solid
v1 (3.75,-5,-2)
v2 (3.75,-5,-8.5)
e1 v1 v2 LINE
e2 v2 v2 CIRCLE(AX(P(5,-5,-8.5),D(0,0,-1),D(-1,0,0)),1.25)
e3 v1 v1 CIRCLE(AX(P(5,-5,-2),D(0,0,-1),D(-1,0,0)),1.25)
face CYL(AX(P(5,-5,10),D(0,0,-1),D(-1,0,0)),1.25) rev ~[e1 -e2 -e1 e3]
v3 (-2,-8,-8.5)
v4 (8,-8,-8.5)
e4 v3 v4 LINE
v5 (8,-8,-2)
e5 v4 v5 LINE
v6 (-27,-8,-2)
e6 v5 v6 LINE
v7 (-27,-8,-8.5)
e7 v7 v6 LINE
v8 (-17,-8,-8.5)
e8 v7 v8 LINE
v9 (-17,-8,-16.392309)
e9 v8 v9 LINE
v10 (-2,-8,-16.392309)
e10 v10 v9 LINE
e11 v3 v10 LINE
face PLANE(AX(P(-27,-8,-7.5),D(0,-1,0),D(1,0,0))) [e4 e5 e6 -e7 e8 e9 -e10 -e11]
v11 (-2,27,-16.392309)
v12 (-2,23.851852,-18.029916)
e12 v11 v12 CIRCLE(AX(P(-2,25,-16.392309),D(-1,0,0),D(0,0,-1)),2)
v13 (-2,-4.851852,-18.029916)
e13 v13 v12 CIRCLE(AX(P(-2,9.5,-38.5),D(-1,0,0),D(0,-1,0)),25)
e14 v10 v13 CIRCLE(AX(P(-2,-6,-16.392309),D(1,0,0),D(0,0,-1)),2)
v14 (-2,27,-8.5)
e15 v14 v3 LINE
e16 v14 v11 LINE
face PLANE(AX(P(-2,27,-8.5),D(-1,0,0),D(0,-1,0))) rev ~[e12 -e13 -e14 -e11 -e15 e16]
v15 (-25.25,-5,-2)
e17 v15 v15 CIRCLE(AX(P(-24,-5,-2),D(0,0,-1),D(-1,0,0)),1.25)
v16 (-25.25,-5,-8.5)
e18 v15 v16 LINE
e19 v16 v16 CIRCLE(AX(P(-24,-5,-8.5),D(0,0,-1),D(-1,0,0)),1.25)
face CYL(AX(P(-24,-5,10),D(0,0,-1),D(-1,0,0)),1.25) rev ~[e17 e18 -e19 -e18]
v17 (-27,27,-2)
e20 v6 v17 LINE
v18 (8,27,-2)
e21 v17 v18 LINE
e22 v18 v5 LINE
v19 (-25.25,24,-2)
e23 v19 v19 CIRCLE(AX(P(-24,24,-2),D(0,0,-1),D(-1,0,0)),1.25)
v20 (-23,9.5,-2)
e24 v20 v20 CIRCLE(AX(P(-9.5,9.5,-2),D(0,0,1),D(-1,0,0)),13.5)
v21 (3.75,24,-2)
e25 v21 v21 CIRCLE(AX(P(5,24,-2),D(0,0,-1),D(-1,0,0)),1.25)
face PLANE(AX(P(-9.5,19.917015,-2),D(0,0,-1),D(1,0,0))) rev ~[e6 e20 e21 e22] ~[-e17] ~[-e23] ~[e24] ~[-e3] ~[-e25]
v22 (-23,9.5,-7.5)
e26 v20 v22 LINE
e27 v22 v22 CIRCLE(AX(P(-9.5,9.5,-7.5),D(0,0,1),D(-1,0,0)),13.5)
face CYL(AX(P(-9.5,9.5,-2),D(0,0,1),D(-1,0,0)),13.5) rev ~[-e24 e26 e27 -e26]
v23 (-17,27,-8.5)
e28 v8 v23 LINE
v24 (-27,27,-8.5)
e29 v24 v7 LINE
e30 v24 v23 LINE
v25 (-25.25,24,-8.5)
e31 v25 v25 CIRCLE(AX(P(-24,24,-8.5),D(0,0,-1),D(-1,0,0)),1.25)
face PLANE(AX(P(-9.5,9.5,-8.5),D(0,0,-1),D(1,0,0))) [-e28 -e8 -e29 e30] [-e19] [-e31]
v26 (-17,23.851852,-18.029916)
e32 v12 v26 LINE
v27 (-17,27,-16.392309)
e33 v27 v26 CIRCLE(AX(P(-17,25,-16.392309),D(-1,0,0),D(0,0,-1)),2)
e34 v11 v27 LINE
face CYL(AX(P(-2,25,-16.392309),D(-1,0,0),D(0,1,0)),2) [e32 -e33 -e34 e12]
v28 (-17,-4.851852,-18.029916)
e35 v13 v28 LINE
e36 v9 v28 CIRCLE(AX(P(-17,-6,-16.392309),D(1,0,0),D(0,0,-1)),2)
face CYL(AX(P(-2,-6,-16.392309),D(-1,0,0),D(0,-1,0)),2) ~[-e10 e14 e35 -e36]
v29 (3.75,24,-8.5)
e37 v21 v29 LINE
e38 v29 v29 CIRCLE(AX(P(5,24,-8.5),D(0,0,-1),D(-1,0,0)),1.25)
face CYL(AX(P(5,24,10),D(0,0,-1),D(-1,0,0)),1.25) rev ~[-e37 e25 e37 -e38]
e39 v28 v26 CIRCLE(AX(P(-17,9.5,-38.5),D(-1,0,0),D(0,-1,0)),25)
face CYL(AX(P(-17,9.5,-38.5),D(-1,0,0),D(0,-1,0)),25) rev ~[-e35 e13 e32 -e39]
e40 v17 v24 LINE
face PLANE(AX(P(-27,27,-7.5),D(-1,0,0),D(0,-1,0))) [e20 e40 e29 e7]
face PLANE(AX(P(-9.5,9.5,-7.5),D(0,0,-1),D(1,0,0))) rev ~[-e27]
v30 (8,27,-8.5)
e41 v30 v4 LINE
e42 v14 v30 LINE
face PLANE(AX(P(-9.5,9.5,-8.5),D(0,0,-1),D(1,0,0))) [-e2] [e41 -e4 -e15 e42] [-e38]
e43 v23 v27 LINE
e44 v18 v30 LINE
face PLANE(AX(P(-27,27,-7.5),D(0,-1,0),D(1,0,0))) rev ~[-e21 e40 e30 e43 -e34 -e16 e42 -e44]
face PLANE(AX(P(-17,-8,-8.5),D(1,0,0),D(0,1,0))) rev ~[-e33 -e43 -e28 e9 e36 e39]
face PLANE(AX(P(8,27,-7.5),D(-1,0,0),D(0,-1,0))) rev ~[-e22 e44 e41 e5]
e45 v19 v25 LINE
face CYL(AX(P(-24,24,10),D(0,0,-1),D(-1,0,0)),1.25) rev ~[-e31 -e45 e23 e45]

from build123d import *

# Parameters (mm, degrees)
F0_W       = 35
F0_H       = 35
F0_W_2     = 23
F0_H_2     = 23
F1_DEPTH   = 2
F3_DEPTH   = 5.5
F4_DEPTH   = 2.5
F5_DEPTH   = 1
F7_W       = 35
F7_H       = 35
F7_R       = 13.5
F8_DEPTH   = 1
F9_D       = 2.5
F9_DEPTH   = 10
F9_TIP     = 0.7510757738
F9_2_D     = 2.5
F9_2_DEPTH = 10
F9_2_TIP   = 0.7510757738
F10_W      = 7.5
F10_H      = 17.5
F11_DEPTH  = 25
F12_R      = 25
F13_DEPTH  = 25
F14_R      = 2


with BuildPart() as f1:
    # F0 (on Top) → F1 (new body)
    with BuildSketch(Plane.XY):
        with Locations((-9.5, 9.5)):
            Rectangle(F0_W, F0_H)
        with Locations((-9.5, 9.5)):
            Rectangle(F0_W_2, F0_H_2, mode=Mode.SUBTRACT)
        with Locations((-9.5, 9.5)):
            Rectangle(F0_W_2, F0_H_2)
        with BuildLine():
            Line((0, 5.027864045), (0, 0))
            Line((0, 0), (-5.027864045, 0))
            ThreePointArc((-5.027864045, 0), (-9.5, -1), (-13.972135955, 0))
            Line((-13.972135955, 0), (-19, 0))
            Line((-19, 0), (-19, 5.027864045))
            ThreePointArc((-19, 5.027864045), (-20, 9.5), (-19, 13.972135955))
            Line((-19, 13.972135955), (-19, 19))
            Line((-19, 19), (-13.972135955, 19))
            ThreePointArc((-13.972135955, 19), (-9.5, 20), (-5.027864045, 19))
            Line((-5.027864045, 19), (0, 19))
            Line((0, 19), (0, 13.972135955))
            ThreePointArc((0, 13.972135955), (0.746950766, 11.7912878475), (1, 9.5))
            ThreePointArc((1, 9.5), (0.746950766, 7.2087121525), (0, 5.027864045))
        make_face(mode=Mode.SUBTRACT)
        with BuildLine():
            Line((-13.972135955, 0), (-5.027864045, 0))
            ThreePointArc((-5.027864045, 0), (-2.0753787975, 2.0753787975), (0, 5.027864045))
            Line((0, 5.027864045), (0, 13.972135955))
            ThreePointArc((0, 13.972135955), (-2.0753787975, 16.9246212025), (-5.027864045, 19))
            Line((-5.027864045, 19), (-13.972135955, 19))
            ThreePointArc((-13.972135955, 19), (-16.9246212025, 16.9246212025), (-19, 13.972135955))
            Line((-19, 13.972135955), (-19, 5.027864045))
            ThreePointArc((-19, 5.027864045), (-16.9246212025, 2.0753787975), (-13.972135955, 0))
        make_face()
        with BuildLine():
            Line((-19, 19), (-19, 13.972135955))
            ThreePointArc((-19, 13.972135955), (-16.9246212025, 16.9246212025), (-13.972135955, 19))
            Line((-13.972135955, 19), (-19, 19))
        make_face()
        with BuildLine():
            ThreePointArc((-5.027864045, 19), (-2.0753787975, 16.9246212025), (0, 13.972135955))
            Line((0, 13.972135955), (0, 19))
            Line((0, 19), (-5.027864045, 19))
        make_face()
        with BuildLine():
            Line((-5.027864045, 0), (0, 0))
            Line((0, 0), (0, 5.027864045))
            ThreePointArc((0, 5.027864045), (-2.0753787975, 2.0753787975), (-5.027864045, 0))
        make_face()
        with BuildLine():
            Line((-19, 0), (-13.972135955, 0))
            ThreePointArc((-13.972135955, 0), (-16.9246212025, 2.0753787975), (-19, 5.027864045))
            Line((-19, 5.027864045), (-19, 0))
        make_face()
        with BuildLine():
            Line((0, 13.972135955), (0, 5.027864045))
            ThreePointArc((0, 5.027864045), (0.746950766, 7.2087121525), (1, 9.5))
            ThreePointArc((1, 9.5), (0.746950766, 11.7912878475), (0, 13.972135955))
        make_face()
        with BuildLine():
            ThreePointArc((-13.972135955, 0), (-9.5, -1), (-5.027864045, 0))
            Line((-5.027864045, 0), (-13.972135955, 0))
        make_face()
        with BuildLine():
            ThreePointArc((-19, 13.972135955), (-20, 9.5), (-19, 5.027864045))
            Line((-19, 5.027864045), (-19, 13.972135955))
        make_face()
        with BuildLine():
            Line((-13.972135955, 19), (-5.027864045, 19))
            ThreePointArc((-5.027864045, 19), (-9.5, 20), (-13.972135955, 19))
        make_face()
    extrude(amount=-F1_DEPTH)

    # F0 (on Top) → F4 (join)
    with BuildSketch(Plane.XY):
        with Locations((-9.5, 9.5)):
            Rectangle(F0_W_2, F0_H_2)
        with BuildLine():
            Line((0, 5.027864045), (0, 0))
            Line((0, 0), (-5.027864045, 0))
            ThreePointArc((-5.027864045, 0), (-9.5, -1), (-13.972135955, 0))
            Line((-13.972135955, 0), (-19, 0))
            Line((-19, 0), (-19, 5.027864045))
            ThreePointArc((-19, 5.027864045), (-20, 9.5), (-19, 13.972135955))
            Line((-19, 13.972135955), (-19, 19))
            Line((-19, 19), (-13.972135955, 19))
            ThreePointArc((-13.972135955, 19), (-9.5, 20), (-5.027864045, 19))
            Line((-5.027864045, 19), (0, 19))
            Line((0, 19), (0, 13.972135955))
            ThreePointArc((0, 13.972135955), (0.746950766, 11.7912878475), (1, 9.5))
            ThreePointArc((1, 9.5), (0.746950766, 7.2087121525), (0, 5.027864045))
        make_face(mode=Mode.SUBTRACT)
        with BuildLine():
            ThreePointArc((-19, 13.972135955), (-20, 9.5), (-19, 5.027864045))
            Line((-19, 5.027864045), (-19, 13.972135955))
        make_face()
        with BuildLine():
            Line((-13.972135955, 19), (-5.027864045, 19))
            ThreePointArc((-5.027864045, 19), (-9.5, 20), (-13.972135955, 19))
        make_face()
        with BuildLine():
            Line((0, 13.972135955), (0, 5.027864045))
            ThreePointArc((0, 5.027864045), (0.746950766, 7.2087121525), (1, 9.5))
            ThreePointArc((1, 9.5), (0.746950766, 11.7912878475), (0, 13.972135955))
        make_face()
        with BuildLine():
            ThreePointArc((-13.972135955, 0), (-9.5, -1), (-5.027864045, 0))
            Line((-5.027864045, 0), (-13.972135955, 0))
        make_face()
    extrude(amount=F4_DEPTH)


with BuildPart() as f3:
    # F2 (on face) → F3 (new body)
    with BuildSketch(Plane(origin=(0, 0, -2), x_dir=(1, 0, 0), z_dir=(0, 0, -1))):
        with BuildLine():
            Line((-27, -9.5), (-27, -27))
            Line((-27, -27), (8, -27))
            Line((8, -27), (8, -9.5))
            Line((8, -9.5), (4, -9.5))
            ThreePointArc((4, -9.5), (-9.5, -23), (-23, -9.5))
            Line((-23, -9.5), (-27, -9.5))
        make_face()
        with BuildLine():
            Line((-27, 8), (-27, -9.5))
            Line((-27, -9.5), (-23, -9.5))
            ThreePointArc((-23, -9.5), (-9.5, 4), (4, -9.5))
            Line((4, -9.5), (8, -9.5))
            Line((8, -9.5), (8, 8))
            Line((8, 8), (-27, 8))
        make_face()
    extrude(amount=F3_DEPTH)


with BuildPart() as f5:
    # F5 (new): a face of the model
    f5_faces = [f3.part.faces().sort_by_distance(p)[0] for p in [
        (-9.5, 26.5050252532, -7.5),
    ]]
    extrude(f5_faces, amount=F5_DEPTH)


with BuildPart() as f5b:
    # F5#2 (new): a face of the model
    f5_2_faces = [f1.part.faces().sort_by_distance(p)[0] for p in [
        (-9.5, 9.5, -2),
    ]]
    extrude(f5_2_faces, amount=F5_DEPTH)


with BuildPart() as f3_1:
    add(f3.part)

    # F7 (on face) → F8 (join)
    with BuildSketch(Plane(origin=(0, 0, -7.5), x_dir=(1, 0, 0), z_dir=(0, 0, -1))):
        with Locations((-9.5, -9.5)):
            Rectangle(F7_W, F7_H)
        with Locations((-9.5, -9.5)):
            Circle(F7_R, mode=Mode.SUBTRACT)
        with Locations((-9.5, -9.5)):
            Circle(F7_R)
    extrude(amount=F8_DEPTH)

    # F9#2
    with Locations(Plane.XY):
        with Locations((-24, -5), (-24, 24), (5, 24), (5, -5)):
            Hole(F9_2_D / 2, depth=F9_2_DEPTH)
            with Locations((0, 0, -(F9_2_DEPTH + F9_2_TIP / 2))):  # 118° drill point
                Cone(0, F9_2_D / 2, F9_2_TIP, mode=Mode.SUBTRACT)

    # F10 (on face) → F11 (join)
    with BuildSketch(Plane(origin=(0, 0, -8.5), x_dir=(1, 0, 0), z_dir=(0, 0, -1))):
        with Locations((-13.25, -0.75)):
            Rectangle(F10_W, F10_H)
        with Locations((-13.25, -18.25)):
            Rectangle(F10_W, F10_H)
        Polygon((-2, 8), (-9.5, 8), (-9.5, -9.5), (-9.5, -27), (-2, -27), (-2, -9.5), align=None)
    extrude(amount=F11_DEPTH)

    # F12 (on face) → F13 (cut)
    with BuildSketch(Plane(origin=(-17, 0, 0), x_dir=(0, -1, 0), z_dir=(-1, 0, 0))):
        with Locations((-9.5, -38.5)):
            Circle(F12_R)
    extrude(amount=-F13_DEPTH, mode=Mode.SUBTRACT)

    # F14
    f14_edges = [f3_1.edges().sort_by_distance(p)[0] for p in [
        (-9.5, -8, -20.646429),
        (-9.5, 27, -20.646429),
    ]]
    fillet(f14_edges, radius=F14_R)


with BuildPart() as f1_1:
    add(f1.part)

    # F9
    with Locations(Plane.XY):
        with Locations((-24, -5), (-24, 24), (5, 24), (5, -5)):
            Hole(F9_D / 2, depth=F9_DEPTH)
            with Locations((0, 0, -(F9_DEPTH + F9_TIP / 2))):  # 118° drill point
                Cone(0, F9_D / 2, F9_TIP, mode=Mode.SUBTRACT)


solid = f3_1.part
